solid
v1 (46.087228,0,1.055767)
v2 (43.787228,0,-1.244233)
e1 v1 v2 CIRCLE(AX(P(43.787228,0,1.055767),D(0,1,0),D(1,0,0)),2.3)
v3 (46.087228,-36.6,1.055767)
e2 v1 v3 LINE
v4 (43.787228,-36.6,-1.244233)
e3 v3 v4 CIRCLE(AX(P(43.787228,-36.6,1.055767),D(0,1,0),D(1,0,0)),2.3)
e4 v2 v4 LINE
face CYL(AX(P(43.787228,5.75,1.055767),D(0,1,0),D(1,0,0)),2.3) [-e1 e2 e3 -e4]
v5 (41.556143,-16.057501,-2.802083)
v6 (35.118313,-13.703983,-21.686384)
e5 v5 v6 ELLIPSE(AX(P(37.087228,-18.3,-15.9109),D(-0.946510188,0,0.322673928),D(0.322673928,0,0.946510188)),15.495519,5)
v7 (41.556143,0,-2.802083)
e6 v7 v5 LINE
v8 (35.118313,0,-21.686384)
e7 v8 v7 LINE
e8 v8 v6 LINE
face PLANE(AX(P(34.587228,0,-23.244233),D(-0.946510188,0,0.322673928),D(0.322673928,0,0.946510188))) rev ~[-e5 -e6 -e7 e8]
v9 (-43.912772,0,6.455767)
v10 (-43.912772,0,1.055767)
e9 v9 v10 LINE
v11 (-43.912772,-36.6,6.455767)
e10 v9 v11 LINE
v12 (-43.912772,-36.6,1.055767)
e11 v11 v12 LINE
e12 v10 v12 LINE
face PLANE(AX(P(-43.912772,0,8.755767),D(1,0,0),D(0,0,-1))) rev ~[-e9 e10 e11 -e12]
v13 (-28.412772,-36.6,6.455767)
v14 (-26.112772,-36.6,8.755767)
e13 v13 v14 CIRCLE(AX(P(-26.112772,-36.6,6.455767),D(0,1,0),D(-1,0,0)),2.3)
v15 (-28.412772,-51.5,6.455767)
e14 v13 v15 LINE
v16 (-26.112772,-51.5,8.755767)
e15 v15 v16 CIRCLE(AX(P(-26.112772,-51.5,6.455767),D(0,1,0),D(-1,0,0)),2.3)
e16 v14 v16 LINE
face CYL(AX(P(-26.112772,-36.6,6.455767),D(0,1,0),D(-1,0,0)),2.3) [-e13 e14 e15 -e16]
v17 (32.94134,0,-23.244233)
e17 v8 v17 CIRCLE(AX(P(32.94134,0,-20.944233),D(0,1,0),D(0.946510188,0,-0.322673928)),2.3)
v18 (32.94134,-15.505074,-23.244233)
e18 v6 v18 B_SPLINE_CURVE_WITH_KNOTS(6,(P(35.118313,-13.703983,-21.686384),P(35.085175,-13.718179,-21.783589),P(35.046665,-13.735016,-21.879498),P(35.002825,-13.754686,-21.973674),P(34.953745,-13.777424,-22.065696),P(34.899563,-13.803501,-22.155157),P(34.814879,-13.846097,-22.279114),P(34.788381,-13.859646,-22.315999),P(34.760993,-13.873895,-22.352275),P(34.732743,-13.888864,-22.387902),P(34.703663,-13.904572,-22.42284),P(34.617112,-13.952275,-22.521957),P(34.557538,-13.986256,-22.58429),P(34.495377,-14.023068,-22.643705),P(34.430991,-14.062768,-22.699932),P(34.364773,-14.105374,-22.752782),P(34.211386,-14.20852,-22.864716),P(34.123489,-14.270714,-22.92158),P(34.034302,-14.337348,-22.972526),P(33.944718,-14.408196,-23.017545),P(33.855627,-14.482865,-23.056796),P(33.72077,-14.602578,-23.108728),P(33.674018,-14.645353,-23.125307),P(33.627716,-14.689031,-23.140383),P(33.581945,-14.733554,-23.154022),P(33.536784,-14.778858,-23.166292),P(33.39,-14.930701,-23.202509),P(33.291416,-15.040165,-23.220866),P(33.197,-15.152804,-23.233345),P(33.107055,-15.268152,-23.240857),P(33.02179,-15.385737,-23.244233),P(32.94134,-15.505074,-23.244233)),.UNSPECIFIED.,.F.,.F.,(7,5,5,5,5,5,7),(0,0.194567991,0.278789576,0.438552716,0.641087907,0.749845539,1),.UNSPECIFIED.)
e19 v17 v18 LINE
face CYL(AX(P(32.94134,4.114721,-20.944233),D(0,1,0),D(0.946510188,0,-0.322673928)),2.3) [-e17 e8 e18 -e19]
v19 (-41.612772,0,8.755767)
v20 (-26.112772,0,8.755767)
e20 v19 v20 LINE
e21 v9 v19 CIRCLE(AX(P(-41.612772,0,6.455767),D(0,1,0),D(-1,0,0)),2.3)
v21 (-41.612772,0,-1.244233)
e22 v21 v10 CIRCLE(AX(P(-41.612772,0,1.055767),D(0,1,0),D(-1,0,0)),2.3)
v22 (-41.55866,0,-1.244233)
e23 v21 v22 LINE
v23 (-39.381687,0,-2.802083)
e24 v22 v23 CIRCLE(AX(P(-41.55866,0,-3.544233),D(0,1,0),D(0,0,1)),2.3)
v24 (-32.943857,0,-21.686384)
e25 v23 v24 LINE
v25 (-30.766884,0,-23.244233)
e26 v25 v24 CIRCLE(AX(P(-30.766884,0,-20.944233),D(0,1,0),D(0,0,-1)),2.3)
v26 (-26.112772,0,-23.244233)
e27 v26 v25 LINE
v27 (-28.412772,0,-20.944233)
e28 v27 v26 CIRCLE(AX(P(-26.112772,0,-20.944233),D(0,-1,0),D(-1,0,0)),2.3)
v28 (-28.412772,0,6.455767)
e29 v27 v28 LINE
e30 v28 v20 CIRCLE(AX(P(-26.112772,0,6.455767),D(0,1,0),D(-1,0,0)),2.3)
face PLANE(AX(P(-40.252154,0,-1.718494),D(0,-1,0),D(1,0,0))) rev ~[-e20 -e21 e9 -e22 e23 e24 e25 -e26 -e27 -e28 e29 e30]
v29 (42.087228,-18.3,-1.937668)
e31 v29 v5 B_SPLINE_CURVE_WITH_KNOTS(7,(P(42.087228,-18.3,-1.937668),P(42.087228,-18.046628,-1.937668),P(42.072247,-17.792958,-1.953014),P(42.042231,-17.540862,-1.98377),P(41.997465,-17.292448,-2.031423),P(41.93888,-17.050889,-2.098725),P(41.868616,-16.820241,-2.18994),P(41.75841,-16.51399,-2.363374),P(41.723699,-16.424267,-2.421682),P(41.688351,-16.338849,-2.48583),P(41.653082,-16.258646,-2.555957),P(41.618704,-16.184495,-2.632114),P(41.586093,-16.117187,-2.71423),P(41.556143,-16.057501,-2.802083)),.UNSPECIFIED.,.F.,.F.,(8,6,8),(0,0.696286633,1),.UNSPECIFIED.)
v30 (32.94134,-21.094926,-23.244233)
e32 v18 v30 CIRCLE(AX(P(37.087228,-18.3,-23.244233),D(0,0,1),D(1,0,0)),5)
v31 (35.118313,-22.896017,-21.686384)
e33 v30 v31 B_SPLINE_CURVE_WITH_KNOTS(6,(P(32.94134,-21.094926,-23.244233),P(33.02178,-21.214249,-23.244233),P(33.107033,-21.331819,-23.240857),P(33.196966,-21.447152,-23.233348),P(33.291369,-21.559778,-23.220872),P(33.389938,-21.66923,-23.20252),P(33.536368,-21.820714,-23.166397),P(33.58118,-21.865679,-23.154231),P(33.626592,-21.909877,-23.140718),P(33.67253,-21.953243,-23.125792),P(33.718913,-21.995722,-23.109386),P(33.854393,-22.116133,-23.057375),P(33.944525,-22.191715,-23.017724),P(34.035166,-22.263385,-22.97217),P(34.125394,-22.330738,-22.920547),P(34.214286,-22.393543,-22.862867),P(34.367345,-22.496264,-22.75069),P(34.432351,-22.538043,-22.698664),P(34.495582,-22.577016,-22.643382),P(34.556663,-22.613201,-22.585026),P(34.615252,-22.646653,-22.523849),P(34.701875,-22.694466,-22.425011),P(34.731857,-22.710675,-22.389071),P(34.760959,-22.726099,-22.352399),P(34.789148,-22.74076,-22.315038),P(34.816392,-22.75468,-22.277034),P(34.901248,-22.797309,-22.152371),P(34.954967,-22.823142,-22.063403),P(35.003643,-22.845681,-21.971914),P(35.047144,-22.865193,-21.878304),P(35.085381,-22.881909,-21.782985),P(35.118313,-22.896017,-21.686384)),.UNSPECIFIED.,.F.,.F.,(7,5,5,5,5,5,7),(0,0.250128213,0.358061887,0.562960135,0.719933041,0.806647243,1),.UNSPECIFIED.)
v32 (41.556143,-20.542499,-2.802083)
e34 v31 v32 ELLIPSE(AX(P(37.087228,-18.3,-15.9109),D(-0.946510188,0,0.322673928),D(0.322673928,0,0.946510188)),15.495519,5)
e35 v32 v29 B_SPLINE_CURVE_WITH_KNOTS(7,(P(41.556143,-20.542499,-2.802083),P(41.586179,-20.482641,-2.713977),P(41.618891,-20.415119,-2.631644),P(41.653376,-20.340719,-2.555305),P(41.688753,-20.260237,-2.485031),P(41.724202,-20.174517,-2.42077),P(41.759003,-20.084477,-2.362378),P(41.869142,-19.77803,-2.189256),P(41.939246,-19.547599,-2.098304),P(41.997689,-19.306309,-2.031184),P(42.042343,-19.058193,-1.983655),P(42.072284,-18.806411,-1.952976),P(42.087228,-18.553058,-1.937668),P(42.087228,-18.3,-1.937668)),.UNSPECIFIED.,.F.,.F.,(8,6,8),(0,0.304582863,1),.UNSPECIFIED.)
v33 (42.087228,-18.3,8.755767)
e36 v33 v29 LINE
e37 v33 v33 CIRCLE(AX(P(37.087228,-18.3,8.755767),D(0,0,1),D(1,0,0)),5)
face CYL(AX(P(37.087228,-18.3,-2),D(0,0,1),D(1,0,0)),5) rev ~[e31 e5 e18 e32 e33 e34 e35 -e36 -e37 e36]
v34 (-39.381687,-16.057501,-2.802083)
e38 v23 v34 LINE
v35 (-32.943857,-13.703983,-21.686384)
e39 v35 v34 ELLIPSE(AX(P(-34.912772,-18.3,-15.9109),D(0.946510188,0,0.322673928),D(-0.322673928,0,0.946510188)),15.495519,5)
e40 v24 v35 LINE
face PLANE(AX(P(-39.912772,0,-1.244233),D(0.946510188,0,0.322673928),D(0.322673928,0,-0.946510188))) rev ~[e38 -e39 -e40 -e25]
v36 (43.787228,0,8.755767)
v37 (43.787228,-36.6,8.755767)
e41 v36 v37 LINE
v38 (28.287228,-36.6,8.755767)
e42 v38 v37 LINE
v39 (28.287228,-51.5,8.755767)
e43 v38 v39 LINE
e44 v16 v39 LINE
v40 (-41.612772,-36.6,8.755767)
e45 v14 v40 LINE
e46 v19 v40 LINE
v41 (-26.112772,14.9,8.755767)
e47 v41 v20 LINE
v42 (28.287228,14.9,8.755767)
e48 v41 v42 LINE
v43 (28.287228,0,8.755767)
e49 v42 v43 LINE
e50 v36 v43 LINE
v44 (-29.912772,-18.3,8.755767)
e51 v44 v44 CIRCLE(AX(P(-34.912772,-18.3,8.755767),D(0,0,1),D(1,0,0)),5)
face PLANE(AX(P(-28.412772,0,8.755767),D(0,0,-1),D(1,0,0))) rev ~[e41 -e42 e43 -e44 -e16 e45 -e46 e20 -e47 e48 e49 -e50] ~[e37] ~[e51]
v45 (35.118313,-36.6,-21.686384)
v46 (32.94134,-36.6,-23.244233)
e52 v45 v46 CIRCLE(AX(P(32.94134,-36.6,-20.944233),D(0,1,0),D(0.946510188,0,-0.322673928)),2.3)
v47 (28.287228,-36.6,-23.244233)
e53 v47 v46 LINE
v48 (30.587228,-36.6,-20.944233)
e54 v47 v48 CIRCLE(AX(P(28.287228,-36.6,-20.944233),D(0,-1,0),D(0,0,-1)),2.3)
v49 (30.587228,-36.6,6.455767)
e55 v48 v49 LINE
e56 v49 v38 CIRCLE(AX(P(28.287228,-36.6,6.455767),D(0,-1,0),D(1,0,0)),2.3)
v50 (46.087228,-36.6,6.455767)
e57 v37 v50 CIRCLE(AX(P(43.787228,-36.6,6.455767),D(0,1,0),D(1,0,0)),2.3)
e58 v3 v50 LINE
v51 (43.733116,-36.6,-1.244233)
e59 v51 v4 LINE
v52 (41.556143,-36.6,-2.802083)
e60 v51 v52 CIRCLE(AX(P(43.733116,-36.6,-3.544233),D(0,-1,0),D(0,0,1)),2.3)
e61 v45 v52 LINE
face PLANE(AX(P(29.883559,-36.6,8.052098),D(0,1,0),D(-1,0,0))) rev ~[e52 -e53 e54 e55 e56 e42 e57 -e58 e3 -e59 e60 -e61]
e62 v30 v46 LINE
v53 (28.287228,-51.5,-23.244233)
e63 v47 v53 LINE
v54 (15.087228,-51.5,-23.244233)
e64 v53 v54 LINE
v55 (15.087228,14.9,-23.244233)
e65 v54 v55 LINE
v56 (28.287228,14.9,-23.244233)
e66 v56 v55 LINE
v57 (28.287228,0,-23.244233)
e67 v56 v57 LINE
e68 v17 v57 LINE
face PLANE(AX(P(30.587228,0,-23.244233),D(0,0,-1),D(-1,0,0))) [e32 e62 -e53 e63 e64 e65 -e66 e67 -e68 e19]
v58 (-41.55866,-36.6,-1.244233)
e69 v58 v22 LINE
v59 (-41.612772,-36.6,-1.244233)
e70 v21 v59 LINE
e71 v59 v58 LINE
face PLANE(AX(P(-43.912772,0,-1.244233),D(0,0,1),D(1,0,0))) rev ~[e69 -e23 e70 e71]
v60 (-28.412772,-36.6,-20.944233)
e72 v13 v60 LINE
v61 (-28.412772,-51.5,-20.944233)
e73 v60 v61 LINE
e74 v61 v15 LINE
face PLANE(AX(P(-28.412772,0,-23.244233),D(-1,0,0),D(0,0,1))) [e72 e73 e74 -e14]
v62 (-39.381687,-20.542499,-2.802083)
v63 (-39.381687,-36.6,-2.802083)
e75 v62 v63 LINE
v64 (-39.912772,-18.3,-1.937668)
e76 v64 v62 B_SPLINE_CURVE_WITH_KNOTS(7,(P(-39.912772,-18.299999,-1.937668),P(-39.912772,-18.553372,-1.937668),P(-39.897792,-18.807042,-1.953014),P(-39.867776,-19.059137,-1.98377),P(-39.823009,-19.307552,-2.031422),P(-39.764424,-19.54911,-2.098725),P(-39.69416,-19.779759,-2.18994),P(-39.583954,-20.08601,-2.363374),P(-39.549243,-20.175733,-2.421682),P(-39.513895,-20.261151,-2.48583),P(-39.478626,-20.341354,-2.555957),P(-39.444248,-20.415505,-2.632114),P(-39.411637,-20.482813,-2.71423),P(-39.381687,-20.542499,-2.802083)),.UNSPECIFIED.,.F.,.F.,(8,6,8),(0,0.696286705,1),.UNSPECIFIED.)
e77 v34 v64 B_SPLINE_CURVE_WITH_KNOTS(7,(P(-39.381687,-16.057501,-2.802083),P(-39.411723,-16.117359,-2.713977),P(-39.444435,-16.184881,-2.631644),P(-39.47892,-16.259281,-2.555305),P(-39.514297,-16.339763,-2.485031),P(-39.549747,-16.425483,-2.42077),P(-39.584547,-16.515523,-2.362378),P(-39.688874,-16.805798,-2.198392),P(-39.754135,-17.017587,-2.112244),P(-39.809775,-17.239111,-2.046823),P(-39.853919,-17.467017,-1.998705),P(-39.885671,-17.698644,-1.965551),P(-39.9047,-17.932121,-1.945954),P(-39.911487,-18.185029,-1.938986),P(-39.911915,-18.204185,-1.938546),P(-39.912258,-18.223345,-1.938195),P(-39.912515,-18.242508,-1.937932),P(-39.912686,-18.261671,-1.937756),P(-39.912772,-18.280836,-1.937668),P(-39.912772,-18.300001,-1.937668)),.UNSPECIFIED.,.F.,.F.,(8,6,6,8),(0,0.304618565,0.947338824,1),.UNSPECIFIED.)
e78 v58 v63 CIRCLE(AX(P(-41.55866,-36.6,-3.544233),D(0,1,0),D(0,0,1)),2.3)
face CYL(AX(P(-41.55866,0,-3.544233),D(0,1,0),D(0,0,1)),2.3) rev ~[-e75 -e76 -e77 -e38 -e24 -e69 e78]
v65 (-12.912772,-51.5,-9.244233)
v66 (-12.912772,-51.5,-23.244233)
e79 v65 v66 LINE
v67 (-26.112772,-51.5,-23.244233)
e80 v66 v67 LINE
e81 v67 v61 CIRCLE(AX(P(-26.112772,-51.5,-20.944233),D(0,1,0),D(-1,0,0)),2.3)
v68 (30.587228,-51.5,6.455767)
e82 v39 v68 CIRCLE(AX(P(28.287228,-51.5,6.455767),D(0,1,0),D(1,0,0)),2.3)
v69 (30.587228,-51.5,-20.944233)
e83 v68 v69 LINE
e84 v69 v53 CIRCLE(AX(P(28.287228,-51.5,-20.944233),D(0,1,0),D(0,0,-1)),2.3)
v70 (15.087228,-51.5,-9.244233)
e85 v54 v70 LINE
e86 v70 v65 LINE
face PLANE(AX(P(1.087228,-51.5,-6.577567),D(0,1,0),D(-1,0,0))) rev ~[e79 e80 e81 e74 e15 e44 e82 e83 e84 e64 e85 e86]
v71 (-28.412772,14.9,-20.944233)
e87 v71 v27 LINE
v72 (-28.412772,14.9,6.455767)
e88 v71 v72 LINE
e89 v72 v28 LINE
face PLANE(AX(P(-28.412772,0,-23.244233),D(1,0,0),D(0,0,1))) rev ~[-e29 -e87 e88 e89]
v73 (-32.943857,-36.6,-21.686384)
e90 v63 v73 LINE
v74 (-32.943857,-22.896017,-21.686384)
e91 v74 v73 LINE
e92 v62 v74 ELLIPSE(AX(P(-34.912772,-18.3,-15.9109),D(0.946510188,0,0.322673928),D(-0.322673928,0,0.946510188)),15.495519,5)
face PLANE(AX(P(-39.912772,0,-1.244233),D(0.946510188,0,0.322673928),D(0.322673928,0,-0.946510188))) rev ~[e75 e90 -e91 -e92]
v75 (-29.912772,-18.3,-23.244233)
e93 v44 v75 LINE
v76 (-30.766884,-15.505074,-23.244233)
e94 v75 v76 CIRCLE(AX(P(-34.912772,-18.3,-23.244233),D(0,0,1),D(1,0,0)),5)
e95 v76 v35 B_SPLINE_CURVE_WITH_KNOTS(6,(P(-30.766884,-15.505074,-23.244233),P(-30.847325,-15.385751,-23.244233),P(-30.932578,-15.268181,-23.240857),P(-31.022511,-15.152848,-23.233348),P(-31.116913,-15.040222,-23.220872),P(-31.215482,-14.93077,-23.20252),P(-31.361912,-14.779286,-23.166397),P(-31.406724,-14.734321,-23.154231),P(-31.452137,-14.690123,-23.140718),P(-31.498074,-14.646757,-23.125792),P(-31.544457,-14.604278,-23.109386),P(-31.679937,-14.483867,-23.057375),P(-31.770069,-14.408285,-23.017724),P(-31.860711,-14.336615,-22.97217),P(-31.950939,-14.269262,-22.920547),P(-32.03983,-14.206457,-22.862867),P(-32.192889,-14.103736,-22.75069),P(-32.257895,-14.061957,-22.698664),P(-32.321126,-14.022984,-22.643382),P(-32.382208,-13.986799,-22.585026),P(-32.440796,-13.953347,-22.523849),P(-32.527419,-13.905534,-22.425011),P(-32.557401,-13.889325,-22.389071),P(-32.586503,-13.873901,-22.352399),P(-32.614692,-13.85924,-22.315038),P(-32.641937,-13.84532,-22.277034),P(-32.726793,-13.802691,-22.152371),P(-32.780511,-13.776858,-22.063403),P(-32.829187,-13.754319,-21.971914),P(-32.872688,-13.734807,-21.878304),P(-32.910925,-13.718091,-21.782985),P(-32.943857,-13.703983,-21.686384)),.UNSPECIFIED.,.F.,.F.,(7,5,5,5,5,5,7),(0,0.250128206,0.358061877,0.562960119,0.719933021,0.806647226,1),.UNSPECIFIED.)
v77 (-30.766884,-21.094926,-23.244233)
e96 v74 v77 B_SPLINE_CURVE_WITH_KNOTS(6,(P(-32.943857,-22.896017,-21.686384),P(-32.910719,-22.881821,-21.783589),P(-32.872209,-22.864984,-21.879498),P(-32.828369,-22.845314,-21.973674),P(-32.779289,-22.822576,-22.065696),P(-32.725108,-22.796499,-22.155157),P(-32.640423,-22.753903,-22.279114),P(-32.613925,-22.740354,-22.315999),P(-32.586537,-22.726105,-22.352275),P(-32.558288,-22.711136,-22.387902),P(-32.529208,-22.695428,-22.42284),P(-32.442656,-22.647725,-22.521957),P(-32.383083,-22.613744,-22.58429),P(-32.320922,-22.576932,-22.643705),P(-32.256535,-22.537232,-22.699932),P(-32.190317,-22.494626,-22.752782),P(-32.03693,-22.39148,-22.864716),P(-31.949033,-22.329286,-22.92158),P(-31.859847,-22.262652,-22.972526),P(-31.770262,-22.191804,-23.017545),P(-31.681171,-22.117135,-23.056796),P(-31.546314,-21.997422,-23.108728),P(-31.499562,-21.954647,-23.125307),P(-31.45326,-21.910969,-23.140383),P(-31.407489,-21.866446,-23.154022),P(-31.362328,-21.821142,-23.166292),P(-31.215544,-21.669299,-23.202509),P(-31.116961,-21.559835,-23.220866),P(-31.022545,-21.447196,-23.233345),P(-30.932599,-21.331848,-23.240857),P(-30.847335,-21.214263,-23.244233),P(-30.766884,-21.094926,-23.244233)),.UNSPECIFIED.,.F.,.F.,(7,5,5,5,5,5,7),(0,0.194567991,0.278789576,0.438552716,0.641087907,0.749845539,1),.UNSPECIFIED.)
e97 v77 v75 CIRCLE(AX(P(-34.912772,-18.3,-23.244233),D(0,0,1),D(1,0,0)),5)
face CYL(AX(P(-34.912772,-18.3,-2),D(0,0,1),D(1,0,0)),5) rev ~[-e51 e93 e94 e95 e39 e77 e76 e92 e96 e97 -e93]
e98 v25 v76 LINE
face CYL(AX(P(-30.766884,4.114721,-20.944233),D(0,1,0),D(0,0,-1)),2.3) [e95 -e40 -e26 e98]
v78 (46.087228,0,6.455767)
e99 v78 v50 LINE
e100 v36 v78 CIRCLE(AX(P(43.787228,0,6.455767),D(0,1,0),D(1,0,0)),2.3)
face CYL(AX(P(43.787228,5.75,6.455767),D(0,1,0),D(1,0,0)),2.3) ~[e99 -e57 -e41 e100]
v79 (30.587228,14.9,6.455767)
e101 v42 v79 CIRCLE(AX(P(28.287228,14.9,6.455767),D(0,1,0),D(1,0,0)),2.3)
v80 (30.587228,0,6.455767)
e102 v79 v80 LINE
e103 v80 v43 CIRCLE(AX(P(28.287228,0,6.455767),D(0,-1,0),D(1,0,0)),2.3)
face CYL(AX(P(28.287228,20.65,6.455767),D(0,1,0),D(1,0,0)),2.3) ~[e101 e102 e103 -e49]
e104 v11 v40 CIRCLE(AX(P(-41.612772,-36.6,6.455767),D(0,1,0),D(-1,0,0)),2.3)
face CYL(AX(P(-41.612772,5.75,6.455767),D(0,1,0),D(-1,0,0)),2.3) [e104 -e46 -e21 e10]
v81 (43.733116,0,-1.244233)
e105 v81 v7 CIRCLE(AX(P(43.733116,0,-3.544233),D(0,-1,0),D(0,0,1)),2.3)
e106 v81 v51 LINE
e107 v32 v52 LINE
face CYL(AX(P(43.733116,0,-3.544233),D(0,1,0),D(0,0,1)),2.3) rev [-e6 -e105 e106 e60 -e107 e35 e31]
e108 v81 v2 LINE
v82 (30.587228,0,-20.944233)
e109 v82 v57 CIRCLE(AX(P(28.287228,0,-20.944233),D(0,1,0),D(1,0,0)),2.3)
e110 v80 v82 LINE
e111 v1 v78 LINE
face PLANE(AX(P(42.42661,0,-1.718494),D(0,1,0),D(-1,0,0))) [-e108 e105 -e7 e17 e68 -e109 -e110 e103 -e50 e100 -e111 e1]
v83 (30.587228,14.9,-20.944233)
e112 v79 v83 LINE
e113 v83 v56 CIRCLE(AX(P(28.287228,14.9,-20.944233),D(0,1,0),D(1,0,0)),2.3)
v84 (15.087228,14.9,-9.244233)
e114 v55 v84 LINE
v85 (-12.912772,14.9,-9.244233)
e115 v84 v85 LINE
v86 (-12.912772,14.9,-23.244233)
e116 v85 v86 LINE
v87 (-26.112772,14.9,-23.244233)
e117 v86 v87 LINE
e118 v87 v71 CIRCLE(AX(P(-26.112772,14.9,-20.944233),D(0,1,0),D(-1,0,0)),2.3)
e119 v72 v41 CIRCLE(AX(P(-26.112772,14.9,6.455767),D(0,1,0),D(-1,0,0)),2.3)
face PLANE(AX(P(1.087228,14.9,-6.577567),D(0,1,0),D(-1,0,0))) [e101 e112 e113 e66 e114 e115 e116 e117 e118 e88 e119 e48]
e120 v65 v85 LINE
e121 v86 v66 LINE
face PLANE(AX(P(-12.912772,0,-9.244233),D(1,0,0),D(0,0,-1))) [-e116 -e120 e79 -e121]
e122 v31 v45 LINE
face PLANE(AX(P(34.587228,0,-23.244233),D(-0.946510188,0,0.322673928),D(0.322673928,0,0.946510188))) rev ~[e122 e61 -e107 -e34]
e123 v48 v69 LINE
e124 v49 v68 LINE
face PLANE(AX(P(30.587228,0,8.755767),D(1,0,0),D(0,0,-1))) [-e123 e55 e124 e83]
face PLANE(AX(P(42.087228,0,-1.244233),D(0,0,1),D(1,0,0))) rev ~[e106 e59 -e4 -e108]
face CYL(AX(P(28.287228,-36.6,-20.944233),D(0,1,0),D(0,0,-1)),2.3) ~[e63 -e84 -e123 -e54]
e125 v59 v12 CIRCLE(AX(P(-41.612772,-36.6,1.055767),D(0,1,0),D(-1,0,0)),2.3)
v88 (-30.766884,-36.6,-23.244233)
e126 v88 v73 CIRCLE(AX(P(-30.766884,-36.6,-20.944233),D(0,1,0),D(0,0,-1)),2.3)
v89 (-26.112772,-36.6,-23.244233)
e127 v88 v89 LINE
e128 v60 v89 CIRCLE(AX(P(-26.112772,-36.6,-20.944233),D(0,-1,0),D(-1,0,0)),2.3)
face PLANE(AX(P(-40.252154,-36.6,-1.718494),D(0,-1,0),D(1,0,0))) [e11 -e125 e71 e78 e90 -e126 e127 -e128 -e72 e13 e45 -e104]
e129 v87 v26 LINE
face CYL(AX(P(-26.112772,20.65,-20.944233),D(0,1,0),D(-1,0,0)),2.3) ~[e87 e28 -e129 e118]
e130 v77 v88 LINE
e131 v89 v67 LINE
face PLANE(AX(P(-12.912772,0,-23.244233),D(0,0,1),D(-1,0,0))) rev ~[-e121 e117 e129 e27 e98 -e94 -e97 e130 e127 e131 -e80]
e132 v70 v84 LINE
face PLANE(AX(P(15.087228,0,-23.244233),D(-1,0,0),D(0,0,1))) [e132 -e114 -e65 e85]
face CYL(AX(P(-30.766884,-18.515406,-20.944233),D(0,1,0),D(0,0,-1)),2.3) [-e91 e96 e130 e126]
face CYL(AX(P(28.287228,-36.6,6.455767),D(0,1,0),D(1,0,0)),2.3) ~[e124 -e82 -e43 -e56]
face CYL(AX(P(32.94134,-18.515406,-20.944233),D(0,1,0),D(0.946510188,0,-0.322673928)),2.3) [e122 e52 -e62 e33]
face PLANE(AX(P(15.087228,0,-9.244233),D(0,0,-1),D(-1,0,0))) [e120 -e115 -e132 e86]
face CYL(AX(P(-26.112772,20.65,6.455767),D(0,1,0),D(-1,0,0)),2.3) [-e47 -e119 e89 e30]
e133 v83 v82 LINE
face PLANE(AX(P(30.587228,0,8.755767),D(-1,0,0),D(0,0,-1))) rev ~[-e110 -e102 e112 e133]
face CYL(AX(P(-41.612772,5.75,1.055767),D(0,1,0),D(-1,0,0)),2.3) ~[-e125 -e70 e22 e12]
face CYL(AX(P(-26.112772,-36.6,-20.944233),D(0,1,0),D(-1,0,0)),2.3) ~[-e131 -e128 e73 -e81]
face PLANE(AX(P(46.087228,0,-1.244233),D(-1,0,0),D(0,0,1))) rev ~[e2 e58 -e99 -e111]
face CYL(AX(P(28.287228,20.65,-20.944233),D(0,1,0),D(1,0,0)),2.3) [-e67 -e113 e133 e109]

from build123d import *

# Parameters (mm, degrees)
F1_DEPTH      = 36.6
F3_DEPTH      = 14.9
F3_DEPTH_BACK = 51.5
F4_R          = 5
F5_DEPTH      = 32.001
F6_T4_DEPTH   = 18.3
F6_S5_R       = 5
F6_T6_DEPTH   = 11
F6_T10_DEPTH  = 18.3
F6_S11_R      = 5
F6_T12_DEPTH  = 11
F6_T16_DEPTH  = 18.3
F6_S17_R      = 5
F6_T18_DEPTH  = 11
F6_T22_DEPTH  = 18.3
F6_S23_R      = 5
F6_T24_DEPTH  = 11
F6_T25_DEPTH  = 48.1
F6_T27_DEPTH  = 22.1993140666
F6_T29_DEPTH  = 22.1993140666
F6_T31_DEPTH  = 20.65
F6_T33_DEPTH  = 20.65


# Not quite as in the source:
# - a fillet or chamfer that OpenCascade refuses, or shapes differently, is made with other operations: its cross-section is extruded or revolved along the edge and cut away or added


with BuildPart() as f1:
    # F0 (on Front) → F1 (new body)
    with BuildSketch(Plane.XZ):
        Polygon((-28.4127721637, 8.7557665049), (-43.9127721637, 8.7557665049), (-43.9127721637, -1.2442334951), (-39.9127721637, -1.2442334951), (-32.4127721637, -23.2442334951), (-28.4127721637, -23.2442334951), align=None)
        Polygon((30.5872278363, 8.7557665049), (-28.4127721637, 8.7557665049), (-28.4127721637, -23.2442334951), (-12.9127721637, -23.2442334951), (-12.9127721637, -9.2442334951), (15.0872278363, -9.2442334951), (15.0872278363, -23.2442334951), (30.5872278363, -23.2442334951), align=None)
        Polygon((46.0872278363, 8.7557665049), (30.5872278363, 8.7557665049), (30.5872278363, -23.2442334951), (34.5872278363, -23.2442334951), (42.0872278363, -1.2442334951), (46.0872278363, -1.2442334951), align=None)
    extrude(amount=F1_DEPTH)

    # F2 (on face) → F3 (join, two sides)
    with BuildSketch(Plane(origin=(0, 0, 0), x_dir=(-1, 0, 0), z_dir=(0, 1, 0))) as f3_sk:
        Polygon((28.4127721637, 8.7557665049), (-30.5872278363, 8.7557665049), (-30.5872278363, -23.2442334951), (-15.0872278363, -23.2442334951), (-15.0872278363, -9.2442334951), (12.9127721637, -9.2442334951), (12.9127721637, -23.2442334951), (28.4127721637, -23.2442334951), align=None)
    extrude(amount=F3_DEPTH)
    extrude(f3_sk.sketch, amount=-F3_DEPTH_BACK)

    # F4 (on face) → F5 (cut, through all)
    with BuildSketch(Plane.XY.offset(8.7557665049)):
        with Locations((-34.9127721637, -18.3)):
            Circle(F4_R)
        with Locations((37.0872278363, -18.3)):
            Circle(F4_R)
    extrude(amount=-F5_DEPTH, mode=Mode.SUBTRACT)

    # F6: fillet of radius 2.3 on 20 edges, made by hand


with BuildPart() as f6_tool2:
    # F6_s3 → F6_t4 (new body)
    with BuildSketch(Plane.XZ.offset(18.3)):
        with BuildLine():
            ThreePointArc((-41.5586603808, -1.2442334951), (-40.2201808476, -1.6738130774), (-39.381686948, -2.8020834612))
            Line((-39.381686948, -2.8020834612), (-39.9127721637, -1.2442334951))
            Line((-39.9127721637, -1.2442334951), (-41.5586603808, -1.2442334951))
        make_face()
    extrude(amount=F6_T4_DEPTH)

    # F6_s5 → F6_t6 (cut, symmetric)
    with BuildSketch(Plane.XY.offset(-2)):
        with Locations((-34.9127721637, -18.3)):
            Circle(F6_S5_R)
    extrude(amount=F6_T6_DEPTH, both=True, mode=Mode.SUBTRACT)


with BuildPart() as f1_1:
    add(f1.part)

    # F6_t1: union F6_tool2
    add(f6_tool2.part)


with BuildPart() as f6_tool8:
    # F6_s9 → F6_t10 (new body)
    with BuildSketch(Plane.XZ.offset(18.3)):
        with BuildLine():
            ThreePointArc((43.7331160534, -1.2442334951), (42.3946365201, -1.6738130774), (41.5561426205, -2.8020834612))
            Line((41.5561426205, -2.8020834612), (42.0872278363, -1.2442334951))
            Line((42.0872278363, -1.2442334951), (43.7331160534, -1.2442334951))
        make_face()
    extrude(amount=F6_T10_DEPTH)

    # F6_s11 → F6_t12 (cut, symmetric)
    with BuildSketch(Plane.XY.offset(-2)):
        with Locations((37.0872278363, -18.3)):
            Circle(F6_S11_R)
    extrude(amount=F6_T12_DEPTH, both=True, mode=Mode.SUBTRACT)


with BuildPart() as f1_2:
    add(f1_1.part)

    # F6_t7: union F6_tool8
    add(f6_tool8.part)


with BuildPart() as f6_tool14:
    # F6_s15 → F6_t16 (new body)
    with BuildSketch(Plane.XZ):
        with BuildLine():
            ThreePointArc((43.7331160534, -1.2442334951), (42.3946365201, -1.6738130774), (41.5561426205, -2.8020834612))
            Line((41.5561426205, -2.8020834612), (42.0872278363, -1.2442334951))
            Line((42.0872278363, -1.2442334951), (43.7331160534, -1.2442334951))
        make_face()
    extrude(amount=F6_T16_DEPTH)

    # F6_s17 → F6_t18 (cut, symmetric)
    with BuildSketch(Plane.XY.offset(-2)):
        with Locations((37.0872278363, -18.3)):
            Circle(F6_S17_R)
    extrude(amount=F6_T18_DEPTH, both=True, mode=Mode.SUBTRACT)


with BuildPart() as f1_3:
    add(f1_2.part)

    # F6_t13: union F6_tool14
    add(f6_tool14.part)


with BuildPart() as f6_tool20:
    # F6_s21 → F6_t22 (new body)
    with BuildSketch(Plane.XZ):
        with BuildLine():
            ThreePointArc((-41.5586603808, -1.2442334951), (-40.2201808476, -1.6738130774), (-39.381686948, -2.8020834612))
            Line((-39.381686948, -2.8020834612), (-39.9127721637, -1.2442334951))
            Line((-39.9127721637, -1.2442334951), (-41.5586603808, -1.2442334951))
        make_face()
    extrude(amount=F6_T22_DEPTH)

    # F6_s23 → F6_t24 (cut, symmetric)
    with BuildSketch(Plane.XY.offset(-2)):
        with Locations((-34.9127721637, -18.3)):
            Circle(F6_S23_R)
    extrude(amount=F6_T24_DEPTH, both=True, mode=Mode.SUBTRACT)


with BuildPart() as f1_4:
    add(f1_3.part)

    # F6_t19: union F6_tool20
    add(f6_tool20.part)

    # F6_s26 → F6_t25 (cut)
    with BuildSketch(Plane.XZ.offset(-5.75)):
        with BuildLine():
            ThreePointArc((-43.9127721637, 1.0557665049), (-43.2391177605, -0.5705790919), (-41.6127721637, -1.2442334951))
            Line((-41.6127721637, -1.2442334951), (-43.9127721637, -1.2442334951))
            Line((-43.9127721637, -1.2442334951), (-43.9127721637, 1.0557665049))
        make_face()
        with BuildLine():
            ThreePointArc((-43.9127721637, 6.4557665049), (-43.2391177605, 8.0821121016), (-41.6127721637, 8.7557665049))
            Line((-41.6127721637, 8.7557665049), (-43.9127721637, 8.7557665049))
            Line((-43.9127721637, 8.7557665049), (-43.9127721637, 6.4557665049))
        make_face()
        with BuildLine():
            ThreePointArc((46.0872278363, 6.4557665049), (45.413573433, 8.0821121016), (43.7872278363, 8.7557665049))
            Line((43.7872278363, 8.7557665049), (46.0872278363, 8.7557665049))
            Line((46.0872278363, 8.7557665049), (46.0872278363, 6.4557665049))
        make_face()
        with BuildLine():
            ThreePointArc((46.0872278363, 1.0557665049), (45.413573433, -0.5705790919), (43.7872278363, -1.2442334951))
            Line((43.7872278363, -1.2442334951), (46.0872278363, -1.2442334951))
            Line((46.0872278363, -1.2442334951), (46.0872278363, 1.0557665049))
        make_face()
    extrude(amount=F6_T25_DEPTH, mode=Mode.SUBTRACT)

    # F6_s28 → F6_t27 (cut)
    with BuildSketch(Plane.XZ.offset(18.5154064762)):
        with BuildLine():
            ThreePointArc((-30.7668839466, -23.2442334951), (-32.1053634799, -22.8146539129), (-32.9438573795, -21.6863835291))
            Line((-32.9438573795, -21.6863835291), (-32.4127721637, -23.2442334951))
            Line((-32.4127721637, -23.2442334951), (-30.7668839466, -23.2442334951))
        make_face()
        with BuildLine():
            ThreePointArc((35.118313052, -21.6863835291), (34.2798191524, -22.8146539129), (32.9413396192, -23.2442334951))
            Line((32.9413396192, -23.2442334951), (34.5872278363, -23.2442334951))
            Line((34.5872278363, -23.2442334951), (35.118313052, -21.6863835291))
        make_face()
    extrude(amount=F6_T27_DEPTH, mode=Mode.SUBTRACT)

    # F6_s30 → F6_t29 (cut)
    with BuildSketch(Plane.XZ.offset(-4.1147205427)):
        with BuildLine():
            ThreePointArc((-30.7668839466, -23.2442334951), (-32.1053634799, -22.8146539129), (-32.9438573795, -21.6863835291))
            Line((-32.9438573795, -21.6863835291), (-32.4127721637, -23.2442334951))
            Line((-32.4127721637, -23.2442334951), (-30.7668839466, -23.2442334951))
        make_face()
        with BuildLine():
            ThreePointArc((35.118313052, -21.6863835291), (34.2798191524, -22.8146539129), (32.9413396192, -23.2442334951))
            Line((32.9413396192, -23.2442334951), (34.5872278363, -23.2442334951))
            Line((34.5872278363, -23.2442334951), (35.118313052, -21.6863835291))
        make_face()
    extrude(amount=F6_T29_DEPTH, mode=Mode.SUBTRACT)

    # F6_s32 → F6_t31 (cut)
    with BuildSketch(Plane.XZ.offset(36.6)):
        with BuildLine():
            ThreePointArc((-28.4127721637, -20.9442334951), (-27.7391177605, -22.5705790919), (-26.1127721637, -23.2442334951))
            Line((-26.1127721637, -23.2442334951), (-28.4127721637, -23.2442334951))
            Line((-28.4127721637, -23.2442334951), (-28.4127721637, -20.9442334951))
        make_face()
        with BuildLine():
            ThreePointArc((-28.4127721637, 6.4557665049), (-27.7391177605, 8.0821121016), (-26.1127721637, 8.7557665049))
            Line((-26.1127721637, 8.7557665049), (-28.4127721637, 8.7557665049))
            Line((-28.4127721637, 8.7557665049), (-28.4127721637, 6.4557665049))
        make_face()
        with BuildLine():
            ThreePointArc((30.5872278363, 6.4557665049), (29.913573433, 8.0821121016), (28.2872278363, 8.7557665049))
            Line((28.2872278363, 8.7557665049), (30.5872278363, 8.7557665049))
            Line((30.5872278363, 8.7557665049), (30.5872278363, 6.4557665049))
        make_face()
        with BuildLine():
            ThreePointArc((28.2872278363, -23.2442334951), (29.913573433, -22.5705790919), (30.5872278363, -20.9442334951))
            Line((30.5872278363, -20.9442334951), (30.5872278363, -23.2442334951))
            Line((30.5872278363, -23.2442334951), (28.2872278363, -23.2442334951))
        make_face()
    extrude(amount=F6_T31_DEPTH, mode=Mode.SUBTRACT)

    # F6_s34 → F6_t33 (cut)
    with BuildSketch(Plane.XZ.offset(-20.65)):
        with BuildLine():
            ThreePointArc((-28.4127721637, -20.9442334951), (-27.7391177605, -22.5705790919), (-26.1127721637, -23.2442334951))
            Line((-26.1127721637, -23.2442334951), (-28.4127721637, -23.2442334951))
            Line((-28.4127721637, -23.2442334951), (-28.4127721637, -20.9442334951))
        make_face()
        with BuildLine():
            ThreePointArc((-28.4127721637, 6.4557665049), (-27.7391177605, 8.0821121016), (-26.1127721637, 8.7557665049))
            Line((-26.1127721637, 8.7557665049), (-28.4127721637, 8.7557665049))
            Line((-28.4127721637, 8.7557665049), (-28.4127721637, 6.4557665049))
        make_face()
        with BuildLine():
            ThreePointArc((30.5872278363, 6.4557665049), (29.913573433, 8.0821121016), (28.2872278363, 8.7557665049))
            Line((28.2872278363, 8.7557665049), (30.5872278363, 8.7557665049))
            Line((30.5872278363, 8.7557665049), (30.5872278363, 6.4557665049))
        make_face()
        with BuildLine():
            ThreePointArc((30.5872278363, -20.9442334951), (29.913573433, -22.5705790919), (28.2872278363, -23.2442334951))
            Line((28.2872278363, -23.2442334951), (30.5872278363, -23.2442334951))
            Line((30.5872278363, -23.2442334951), (30.5872278363, -20.9442334951))
        make_face()
    extrude(amount=F6_T33_DEPTH, mode=Mode.SUBTRACT)


solid = f1_4.part
